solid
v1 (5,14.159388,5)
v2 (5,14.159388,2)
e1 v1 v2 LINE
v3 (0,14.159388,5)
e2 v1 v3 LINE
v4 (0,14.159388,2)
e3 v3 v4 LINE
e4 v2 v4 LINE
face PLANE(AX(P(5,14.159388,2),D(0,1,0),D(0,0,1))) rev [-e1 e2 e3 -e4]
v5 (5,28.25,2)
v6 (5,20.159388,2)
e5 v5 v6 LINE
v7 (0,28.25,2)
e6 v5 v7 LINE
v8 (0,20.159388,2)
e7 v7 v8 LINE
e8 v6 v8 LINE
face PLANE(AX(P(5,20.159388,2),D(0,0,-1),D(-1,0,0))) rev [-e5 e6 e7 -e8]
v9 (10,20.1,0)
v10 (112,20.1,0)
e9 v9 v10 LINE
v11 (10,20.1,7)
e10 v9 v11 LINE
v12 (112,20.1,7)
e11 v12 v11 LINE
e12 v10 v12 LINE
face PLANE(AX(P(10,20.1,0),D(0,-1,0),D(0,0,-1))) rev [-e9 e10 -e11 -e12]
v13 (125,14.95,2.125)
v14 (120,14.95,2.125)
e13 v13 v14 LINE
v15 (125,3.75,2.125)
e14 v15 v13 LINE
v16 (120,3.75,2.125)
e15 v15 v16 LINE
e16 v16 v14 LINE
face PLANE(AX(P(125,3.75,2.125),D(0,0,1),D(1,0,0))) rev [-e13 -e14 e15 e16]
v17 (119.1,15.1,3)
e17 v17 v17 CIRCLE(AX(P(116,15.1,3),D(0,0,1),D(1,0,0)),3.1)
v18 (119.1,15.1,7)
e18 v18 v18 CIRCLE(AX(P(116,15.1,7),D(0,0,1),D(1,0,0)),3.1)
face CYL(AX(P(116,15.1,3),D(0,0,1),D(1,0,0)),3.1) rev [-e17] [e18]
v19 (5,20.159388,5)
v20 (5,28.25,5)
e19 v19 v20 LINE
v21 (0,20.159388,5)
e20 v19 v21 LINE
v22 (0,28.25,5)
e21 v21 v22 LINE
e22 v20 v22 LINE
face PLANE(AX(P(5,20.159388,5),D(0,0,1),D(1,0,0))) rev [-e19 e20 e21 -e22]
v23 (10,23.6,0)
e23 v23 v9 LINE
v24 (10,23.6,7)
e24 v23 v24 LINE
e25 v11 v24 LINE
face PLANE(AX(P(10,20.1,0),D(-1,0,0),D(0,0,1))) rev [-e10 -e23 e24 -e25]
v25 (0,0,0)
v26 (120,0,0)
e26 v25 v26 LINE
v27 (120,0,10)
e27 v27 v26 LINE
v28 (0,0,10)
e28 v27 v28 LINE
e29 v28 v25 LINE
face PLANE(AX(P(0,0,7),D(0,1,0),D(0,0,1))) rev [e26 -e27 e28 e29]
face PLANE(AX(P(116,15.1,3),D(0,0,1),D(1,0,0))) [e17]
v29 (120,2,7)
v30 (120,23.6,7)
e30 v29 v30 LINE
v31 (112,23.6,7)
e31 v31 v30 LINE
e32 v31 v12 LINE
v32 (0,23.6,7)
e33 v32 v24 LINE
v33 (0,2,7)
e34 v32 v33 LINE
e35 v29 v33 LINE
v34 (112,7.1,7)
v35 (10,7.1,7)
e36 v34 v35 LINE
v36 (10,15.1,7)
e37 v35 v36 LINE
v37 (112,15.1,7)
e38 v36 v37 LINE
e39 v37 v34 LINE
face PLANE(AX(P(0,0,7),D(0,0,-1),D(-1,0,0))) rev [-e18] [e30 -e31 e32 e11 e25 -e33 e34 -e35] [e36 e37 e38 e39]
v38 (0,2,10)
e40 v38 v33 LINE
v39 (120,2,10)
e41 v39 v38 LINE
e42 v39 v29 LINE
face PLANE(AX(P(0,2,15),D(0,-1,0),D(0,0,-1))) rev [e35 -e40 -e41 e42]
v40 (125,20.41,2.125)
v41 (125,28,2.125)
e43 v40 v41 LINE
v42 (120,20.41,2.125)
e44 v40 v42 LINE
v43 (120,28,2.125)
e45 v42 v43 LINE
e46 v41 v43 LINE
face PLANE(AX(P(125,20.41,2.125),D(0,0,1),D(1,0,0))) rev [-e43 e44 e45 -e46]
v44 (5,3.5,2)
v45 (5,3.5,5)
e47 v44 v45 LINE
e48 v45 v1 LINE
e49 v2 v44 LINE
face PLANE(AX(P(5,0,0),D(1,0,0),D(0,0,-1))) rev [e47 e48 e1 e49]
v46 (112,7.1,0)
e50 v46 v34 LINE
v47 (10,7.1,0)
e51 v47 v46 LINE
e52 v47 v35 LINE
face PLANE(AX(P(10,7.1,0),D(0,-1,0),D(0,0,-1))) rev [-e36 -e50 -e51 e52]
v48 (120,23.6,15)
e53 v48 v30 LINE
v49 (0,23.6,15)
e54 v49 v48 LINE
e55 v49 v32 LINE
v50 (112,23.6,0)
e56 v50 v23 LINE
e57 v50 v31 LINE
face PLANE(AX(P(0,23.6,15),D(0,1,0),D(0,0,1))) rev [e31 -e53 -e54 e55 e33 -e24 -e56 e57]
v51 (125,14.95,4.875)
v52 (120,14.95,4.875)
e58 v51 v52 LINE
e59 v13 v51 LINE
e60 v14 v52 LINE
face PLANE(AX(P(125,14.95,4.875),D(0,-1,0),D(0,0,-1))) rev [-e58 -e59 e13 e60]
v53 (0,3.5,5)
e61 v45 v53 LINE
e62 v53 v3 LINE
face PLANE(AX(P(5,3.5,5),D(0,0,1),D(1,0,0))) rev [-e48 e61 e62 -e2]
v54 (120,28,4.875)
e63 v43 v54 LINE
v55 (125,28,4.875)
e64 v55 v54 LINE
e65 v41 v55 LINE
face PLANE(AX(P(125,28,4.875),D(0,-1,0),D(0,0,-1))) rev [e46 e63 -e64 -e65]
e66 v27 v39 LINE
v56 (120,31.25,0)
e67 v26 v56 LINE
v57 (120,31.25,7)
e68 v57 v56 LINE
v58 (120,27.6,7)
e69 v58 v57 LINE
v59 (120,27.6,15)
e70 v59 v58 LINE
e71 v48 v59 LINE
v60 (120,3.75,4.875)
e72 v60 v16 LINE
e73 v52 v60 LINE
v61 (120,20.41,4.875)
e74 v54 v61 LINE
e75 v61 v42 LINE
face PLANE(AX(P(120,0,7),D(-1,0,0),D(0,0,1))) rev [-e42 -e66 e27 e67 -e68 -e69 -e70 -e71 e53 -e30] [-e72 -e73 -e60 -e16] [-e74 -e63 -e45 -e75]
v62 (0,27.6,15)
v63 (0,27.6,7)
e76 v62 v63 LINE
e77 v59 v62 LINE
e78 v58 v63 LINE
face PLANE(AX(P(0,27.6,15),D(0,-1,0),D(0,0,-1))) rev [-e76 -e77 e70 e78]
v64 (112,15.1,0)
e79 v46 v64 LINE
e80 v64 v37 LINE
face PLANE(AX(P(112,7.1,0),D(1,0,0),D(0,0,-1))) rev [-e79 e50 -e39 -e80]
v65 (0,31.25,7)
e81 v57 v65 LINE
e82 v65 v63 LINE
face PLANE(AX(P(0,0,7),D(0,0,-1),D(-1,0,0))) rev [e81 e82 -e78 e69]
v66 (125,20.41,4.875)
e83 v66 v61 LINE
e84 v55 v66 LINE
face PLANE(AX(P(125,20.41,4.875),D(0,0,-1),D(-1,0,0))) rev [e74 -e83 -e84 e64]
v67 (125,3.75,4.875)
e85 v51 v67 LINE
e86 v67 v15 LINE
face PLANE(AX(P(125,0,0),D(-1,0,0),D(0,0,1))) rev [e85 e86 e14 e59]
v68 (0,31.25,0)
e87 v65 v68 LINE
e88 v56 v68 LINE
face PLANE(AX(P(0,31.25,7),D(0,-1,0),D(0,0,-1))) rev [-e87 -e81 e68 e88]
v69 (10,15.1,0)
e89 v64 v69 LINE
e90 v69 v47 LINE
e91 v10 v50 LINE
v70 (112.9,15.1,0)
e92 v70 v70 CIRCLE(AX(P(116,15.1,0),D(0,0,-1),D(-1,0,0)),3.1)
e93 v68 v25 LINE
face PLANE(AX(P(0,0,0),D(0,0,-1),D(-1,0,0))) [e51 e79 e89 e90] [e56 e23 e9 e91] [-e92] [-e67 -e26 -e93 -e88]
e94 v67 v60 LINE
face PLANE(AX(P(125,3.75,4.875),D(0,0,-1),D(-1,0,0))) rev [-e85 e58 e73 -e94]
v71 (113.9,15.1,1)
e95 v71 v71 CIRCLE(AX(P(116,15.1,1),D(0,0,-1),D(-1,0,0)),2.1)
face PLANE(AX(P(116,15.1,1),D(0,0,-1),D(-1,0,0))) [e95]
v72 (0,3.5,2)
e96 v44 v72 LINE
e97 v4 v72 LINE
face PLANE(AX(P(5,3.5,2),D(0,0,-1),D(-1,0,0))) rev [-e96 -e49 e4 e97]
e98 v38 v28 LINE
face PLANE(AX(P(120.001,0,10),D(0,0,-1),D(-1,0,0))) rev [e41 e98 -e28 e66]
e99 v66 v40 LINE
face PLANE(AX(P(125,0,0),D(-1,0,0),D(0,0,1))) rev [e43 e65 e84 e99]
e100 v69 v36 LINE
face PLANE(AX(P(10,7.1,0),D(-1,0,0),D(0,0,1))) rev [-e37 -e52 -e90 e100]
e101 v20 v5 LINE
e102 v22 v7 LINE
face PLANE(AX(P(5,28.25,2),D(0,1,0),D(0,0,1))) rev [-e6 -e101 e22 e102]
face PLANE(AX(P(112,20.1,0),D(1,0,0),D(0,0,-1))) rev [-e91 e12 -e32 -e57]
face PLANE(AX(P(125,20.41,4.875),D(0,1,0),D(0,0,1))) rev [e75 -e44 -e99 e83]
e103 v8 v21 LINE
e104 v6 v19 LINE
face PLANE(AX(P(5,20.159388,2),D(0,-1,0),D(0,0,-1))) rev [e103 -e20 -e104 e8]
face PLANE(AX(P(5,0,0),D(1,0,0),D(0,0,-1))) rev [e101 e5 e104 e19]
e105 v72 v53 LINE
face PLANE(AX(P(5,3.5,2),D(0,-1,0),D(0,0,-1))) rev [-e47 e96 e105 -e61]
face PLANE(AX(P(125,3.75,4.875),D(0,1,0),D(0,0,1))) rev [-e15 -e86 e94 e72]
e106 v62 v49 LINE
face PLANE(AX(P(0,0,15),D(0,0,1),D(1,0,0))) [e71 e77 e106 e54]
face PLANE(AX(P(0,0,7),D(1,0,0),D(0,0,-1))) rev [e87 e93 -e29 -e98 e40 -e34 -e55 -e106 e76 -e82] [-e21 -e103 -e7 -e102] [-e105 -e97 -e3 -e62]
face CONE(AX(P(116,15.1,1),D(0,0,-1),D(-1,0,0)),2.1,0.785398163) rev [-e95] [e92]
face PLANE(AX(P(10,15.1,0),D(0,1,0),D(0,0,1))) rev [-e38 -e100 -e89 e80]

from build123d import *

# Parameters (mm, degrees)
SKETCH1_W               = 120
SKETCH1_H               = 31.25
BOSS_EXTRUDE1_DEPTH     = 7
SKETCH2_W               = 120
SKETCH2_H               = 4
SKETCH2_H_2             = 2
BOSS_EXTRUDE2_DEPTH     = 8
CUT_EXTRUDE1_DEPTH      = 125.260059955
CUT_EXTRUDE1_DEPTH_BACK = 125.260059955
SKETCH3_W               = 102
SKETCH3_H               = 8
SKETCH3_H_2             = 3.5
CUT_EXTRUDE3_REACH      = 126.906
SKETCH6_W               = 5
SKETCH6_H               = 2
SKETCH4_W               = 3
SKETCH4_H               = 8.090611825
SKETCH4_H_2             = 10.659388175
CUT_EXTRUDE4_DEPTH      = 5
SKETCH5_W               = 2.75
SKETCH5_H               = 7.59
SKETCH5_H_2             = 11.2
BOSS_EXTRUDE3_DEPTH     = 5
SKETCH7_R               = 3.1
CUT_EXTRUDE5_DEPTH      = 4
CUT_EXTRUDE6_START      = -1
SKETCH8_R               = 3.1
CUT_EXTRUDE6_DEPTH      = 1
CHAMFER1_SIZE           = 1


with BuildPart() as part:
    # Sketch1 → Boss-Extrude1 (new body)
    with BuildSketch(Plane.XY):
        with Locations((60, 15.625)):
            Rectangle(SKETCH1_W, SKETCH1_H)
    extrude(amount=BOSS_EXTRUDE1_DEPTH)

    # Sketch2 → Boss-Extrude2 (add)
    with BuildSketch(Plane.XY.offset(7)):
        with Locations((60, 25.6)):
            Rectangle(SKETCH2_W, SKETCH2_H)
        with Locations((60, 1)):
            Rectangle(SKETCH2_W, SKETCH2_H_2)
    extrude(amount=BOSS_EXTRUDE2_DEPTH)

    # Sketch3 → Cut-Extrude1 (cut, two sides: drawn at the far end of the back side and taken through both)
    with BuildSketch(Plane.XY.offset(7).offset(-CUT_EXTRUDE1_DEPTH_BACK)):
        with Locations((61, 11.1)):
            Rectangle(SKETCH3_W, SKETCH3_H)
        with Locations((61, 21.85)):
            Rectangle(SKETCH3_W, SKETCH3_H_2)
    extrude(amount=CUT_EXTRUDE1_DEPTH + CUT_EXTRUDE1_DEPTH_BACK, mode=Mode.SUBTRACT)

    # Sketch6 → Cut-Extrude3 (cut, up to next)
    with BuildSketch(Plane.ZY, mode=Mode.PRIVATE) as cut_extrude3_sk1:
        with Locations((12.5, 1)):
            Rectangle(SKETCH6_W, SKETCH6_H)
    cut_extrude3_tool1 = extrude(cut_extrude3_sk1.sketch, amount=-CUT_EXTRUDE3_REACH, mode=Mode.PRIVATE) & part.part
    add(cut_extrude3_tool1.solids().sort_by_distance((0, 1, 12.5))[0], mode=Mode.SUBTRACT)

    # Sketch4 → Cut-Extrude4 (cut)
    with BuildSketch(Plane.ZY):
        with Locations((3.5, 24.204694088)):
            Rectangle(SKETCH4_W, SKETCH4_H)
        with Locations((3.5, 8.829694088)):
            Rectangle(SKETCH4_W, SKETCH4_H_2)
    extrude(amount=-CUT_EXTRUDE4_DEPTH, mode=Mode.SUBTRACT)

    # Sketch5 → Boss-Extrude3 (add)
    with BuildSketch(Plane(origin=(120, 0, 0), x_dir=(0, 0, -1), z_dir=(1, 0, 0))):
        with Locations((-3.5, 24.205)):
            Rectangle(SKETCH5_W, SKETCH5_H)
        with Locations((-3.5, 9.35)):
            Rectangle(SKETCH5_W, SKETCH5_H_2)
    extrude(amount=BOSS_EXTRUDE3_DEPTH)

    # Sketch7 → Cut-Extrude5 (cut)
    with BuildSketch(Plane.XY.offset(7)):
        with Locations((116, 15.1)):
            Circle(SKETCH7_R)
    extrude(amount=-CUT_EXTRUDE5_DEPTH, mode=Mode.SUBTRACT)

    # Sketch8 → Cut-Extrude6 (cut)
    with BuildSketch(Plane(origin=(0, 0, 0), x_dir=(-1, 0, 0), z_dir=(0, 0, -1)).offset(CUT_EXTRUDE6_START)):
        with Locations(Location((-116, 15.1, 0), (0, 0, 180))):
            Circle(SKETCH8_R)
    extrude(amount=CUT_EXTRUDE6_DEPTH, mode=Mode.SUBTRACT)

    # Chamfer1
    chamfer1_edges = [part.edges().sort_by_distance(p)[0] for p in [
        (112.9, 15.1, 1),
    ]]
    chamfer(chamfer1_edges, length=CHAMFER1_SIZE - 0.0001)  # a hair under: the kernel refuses the full size


solid = part.part
